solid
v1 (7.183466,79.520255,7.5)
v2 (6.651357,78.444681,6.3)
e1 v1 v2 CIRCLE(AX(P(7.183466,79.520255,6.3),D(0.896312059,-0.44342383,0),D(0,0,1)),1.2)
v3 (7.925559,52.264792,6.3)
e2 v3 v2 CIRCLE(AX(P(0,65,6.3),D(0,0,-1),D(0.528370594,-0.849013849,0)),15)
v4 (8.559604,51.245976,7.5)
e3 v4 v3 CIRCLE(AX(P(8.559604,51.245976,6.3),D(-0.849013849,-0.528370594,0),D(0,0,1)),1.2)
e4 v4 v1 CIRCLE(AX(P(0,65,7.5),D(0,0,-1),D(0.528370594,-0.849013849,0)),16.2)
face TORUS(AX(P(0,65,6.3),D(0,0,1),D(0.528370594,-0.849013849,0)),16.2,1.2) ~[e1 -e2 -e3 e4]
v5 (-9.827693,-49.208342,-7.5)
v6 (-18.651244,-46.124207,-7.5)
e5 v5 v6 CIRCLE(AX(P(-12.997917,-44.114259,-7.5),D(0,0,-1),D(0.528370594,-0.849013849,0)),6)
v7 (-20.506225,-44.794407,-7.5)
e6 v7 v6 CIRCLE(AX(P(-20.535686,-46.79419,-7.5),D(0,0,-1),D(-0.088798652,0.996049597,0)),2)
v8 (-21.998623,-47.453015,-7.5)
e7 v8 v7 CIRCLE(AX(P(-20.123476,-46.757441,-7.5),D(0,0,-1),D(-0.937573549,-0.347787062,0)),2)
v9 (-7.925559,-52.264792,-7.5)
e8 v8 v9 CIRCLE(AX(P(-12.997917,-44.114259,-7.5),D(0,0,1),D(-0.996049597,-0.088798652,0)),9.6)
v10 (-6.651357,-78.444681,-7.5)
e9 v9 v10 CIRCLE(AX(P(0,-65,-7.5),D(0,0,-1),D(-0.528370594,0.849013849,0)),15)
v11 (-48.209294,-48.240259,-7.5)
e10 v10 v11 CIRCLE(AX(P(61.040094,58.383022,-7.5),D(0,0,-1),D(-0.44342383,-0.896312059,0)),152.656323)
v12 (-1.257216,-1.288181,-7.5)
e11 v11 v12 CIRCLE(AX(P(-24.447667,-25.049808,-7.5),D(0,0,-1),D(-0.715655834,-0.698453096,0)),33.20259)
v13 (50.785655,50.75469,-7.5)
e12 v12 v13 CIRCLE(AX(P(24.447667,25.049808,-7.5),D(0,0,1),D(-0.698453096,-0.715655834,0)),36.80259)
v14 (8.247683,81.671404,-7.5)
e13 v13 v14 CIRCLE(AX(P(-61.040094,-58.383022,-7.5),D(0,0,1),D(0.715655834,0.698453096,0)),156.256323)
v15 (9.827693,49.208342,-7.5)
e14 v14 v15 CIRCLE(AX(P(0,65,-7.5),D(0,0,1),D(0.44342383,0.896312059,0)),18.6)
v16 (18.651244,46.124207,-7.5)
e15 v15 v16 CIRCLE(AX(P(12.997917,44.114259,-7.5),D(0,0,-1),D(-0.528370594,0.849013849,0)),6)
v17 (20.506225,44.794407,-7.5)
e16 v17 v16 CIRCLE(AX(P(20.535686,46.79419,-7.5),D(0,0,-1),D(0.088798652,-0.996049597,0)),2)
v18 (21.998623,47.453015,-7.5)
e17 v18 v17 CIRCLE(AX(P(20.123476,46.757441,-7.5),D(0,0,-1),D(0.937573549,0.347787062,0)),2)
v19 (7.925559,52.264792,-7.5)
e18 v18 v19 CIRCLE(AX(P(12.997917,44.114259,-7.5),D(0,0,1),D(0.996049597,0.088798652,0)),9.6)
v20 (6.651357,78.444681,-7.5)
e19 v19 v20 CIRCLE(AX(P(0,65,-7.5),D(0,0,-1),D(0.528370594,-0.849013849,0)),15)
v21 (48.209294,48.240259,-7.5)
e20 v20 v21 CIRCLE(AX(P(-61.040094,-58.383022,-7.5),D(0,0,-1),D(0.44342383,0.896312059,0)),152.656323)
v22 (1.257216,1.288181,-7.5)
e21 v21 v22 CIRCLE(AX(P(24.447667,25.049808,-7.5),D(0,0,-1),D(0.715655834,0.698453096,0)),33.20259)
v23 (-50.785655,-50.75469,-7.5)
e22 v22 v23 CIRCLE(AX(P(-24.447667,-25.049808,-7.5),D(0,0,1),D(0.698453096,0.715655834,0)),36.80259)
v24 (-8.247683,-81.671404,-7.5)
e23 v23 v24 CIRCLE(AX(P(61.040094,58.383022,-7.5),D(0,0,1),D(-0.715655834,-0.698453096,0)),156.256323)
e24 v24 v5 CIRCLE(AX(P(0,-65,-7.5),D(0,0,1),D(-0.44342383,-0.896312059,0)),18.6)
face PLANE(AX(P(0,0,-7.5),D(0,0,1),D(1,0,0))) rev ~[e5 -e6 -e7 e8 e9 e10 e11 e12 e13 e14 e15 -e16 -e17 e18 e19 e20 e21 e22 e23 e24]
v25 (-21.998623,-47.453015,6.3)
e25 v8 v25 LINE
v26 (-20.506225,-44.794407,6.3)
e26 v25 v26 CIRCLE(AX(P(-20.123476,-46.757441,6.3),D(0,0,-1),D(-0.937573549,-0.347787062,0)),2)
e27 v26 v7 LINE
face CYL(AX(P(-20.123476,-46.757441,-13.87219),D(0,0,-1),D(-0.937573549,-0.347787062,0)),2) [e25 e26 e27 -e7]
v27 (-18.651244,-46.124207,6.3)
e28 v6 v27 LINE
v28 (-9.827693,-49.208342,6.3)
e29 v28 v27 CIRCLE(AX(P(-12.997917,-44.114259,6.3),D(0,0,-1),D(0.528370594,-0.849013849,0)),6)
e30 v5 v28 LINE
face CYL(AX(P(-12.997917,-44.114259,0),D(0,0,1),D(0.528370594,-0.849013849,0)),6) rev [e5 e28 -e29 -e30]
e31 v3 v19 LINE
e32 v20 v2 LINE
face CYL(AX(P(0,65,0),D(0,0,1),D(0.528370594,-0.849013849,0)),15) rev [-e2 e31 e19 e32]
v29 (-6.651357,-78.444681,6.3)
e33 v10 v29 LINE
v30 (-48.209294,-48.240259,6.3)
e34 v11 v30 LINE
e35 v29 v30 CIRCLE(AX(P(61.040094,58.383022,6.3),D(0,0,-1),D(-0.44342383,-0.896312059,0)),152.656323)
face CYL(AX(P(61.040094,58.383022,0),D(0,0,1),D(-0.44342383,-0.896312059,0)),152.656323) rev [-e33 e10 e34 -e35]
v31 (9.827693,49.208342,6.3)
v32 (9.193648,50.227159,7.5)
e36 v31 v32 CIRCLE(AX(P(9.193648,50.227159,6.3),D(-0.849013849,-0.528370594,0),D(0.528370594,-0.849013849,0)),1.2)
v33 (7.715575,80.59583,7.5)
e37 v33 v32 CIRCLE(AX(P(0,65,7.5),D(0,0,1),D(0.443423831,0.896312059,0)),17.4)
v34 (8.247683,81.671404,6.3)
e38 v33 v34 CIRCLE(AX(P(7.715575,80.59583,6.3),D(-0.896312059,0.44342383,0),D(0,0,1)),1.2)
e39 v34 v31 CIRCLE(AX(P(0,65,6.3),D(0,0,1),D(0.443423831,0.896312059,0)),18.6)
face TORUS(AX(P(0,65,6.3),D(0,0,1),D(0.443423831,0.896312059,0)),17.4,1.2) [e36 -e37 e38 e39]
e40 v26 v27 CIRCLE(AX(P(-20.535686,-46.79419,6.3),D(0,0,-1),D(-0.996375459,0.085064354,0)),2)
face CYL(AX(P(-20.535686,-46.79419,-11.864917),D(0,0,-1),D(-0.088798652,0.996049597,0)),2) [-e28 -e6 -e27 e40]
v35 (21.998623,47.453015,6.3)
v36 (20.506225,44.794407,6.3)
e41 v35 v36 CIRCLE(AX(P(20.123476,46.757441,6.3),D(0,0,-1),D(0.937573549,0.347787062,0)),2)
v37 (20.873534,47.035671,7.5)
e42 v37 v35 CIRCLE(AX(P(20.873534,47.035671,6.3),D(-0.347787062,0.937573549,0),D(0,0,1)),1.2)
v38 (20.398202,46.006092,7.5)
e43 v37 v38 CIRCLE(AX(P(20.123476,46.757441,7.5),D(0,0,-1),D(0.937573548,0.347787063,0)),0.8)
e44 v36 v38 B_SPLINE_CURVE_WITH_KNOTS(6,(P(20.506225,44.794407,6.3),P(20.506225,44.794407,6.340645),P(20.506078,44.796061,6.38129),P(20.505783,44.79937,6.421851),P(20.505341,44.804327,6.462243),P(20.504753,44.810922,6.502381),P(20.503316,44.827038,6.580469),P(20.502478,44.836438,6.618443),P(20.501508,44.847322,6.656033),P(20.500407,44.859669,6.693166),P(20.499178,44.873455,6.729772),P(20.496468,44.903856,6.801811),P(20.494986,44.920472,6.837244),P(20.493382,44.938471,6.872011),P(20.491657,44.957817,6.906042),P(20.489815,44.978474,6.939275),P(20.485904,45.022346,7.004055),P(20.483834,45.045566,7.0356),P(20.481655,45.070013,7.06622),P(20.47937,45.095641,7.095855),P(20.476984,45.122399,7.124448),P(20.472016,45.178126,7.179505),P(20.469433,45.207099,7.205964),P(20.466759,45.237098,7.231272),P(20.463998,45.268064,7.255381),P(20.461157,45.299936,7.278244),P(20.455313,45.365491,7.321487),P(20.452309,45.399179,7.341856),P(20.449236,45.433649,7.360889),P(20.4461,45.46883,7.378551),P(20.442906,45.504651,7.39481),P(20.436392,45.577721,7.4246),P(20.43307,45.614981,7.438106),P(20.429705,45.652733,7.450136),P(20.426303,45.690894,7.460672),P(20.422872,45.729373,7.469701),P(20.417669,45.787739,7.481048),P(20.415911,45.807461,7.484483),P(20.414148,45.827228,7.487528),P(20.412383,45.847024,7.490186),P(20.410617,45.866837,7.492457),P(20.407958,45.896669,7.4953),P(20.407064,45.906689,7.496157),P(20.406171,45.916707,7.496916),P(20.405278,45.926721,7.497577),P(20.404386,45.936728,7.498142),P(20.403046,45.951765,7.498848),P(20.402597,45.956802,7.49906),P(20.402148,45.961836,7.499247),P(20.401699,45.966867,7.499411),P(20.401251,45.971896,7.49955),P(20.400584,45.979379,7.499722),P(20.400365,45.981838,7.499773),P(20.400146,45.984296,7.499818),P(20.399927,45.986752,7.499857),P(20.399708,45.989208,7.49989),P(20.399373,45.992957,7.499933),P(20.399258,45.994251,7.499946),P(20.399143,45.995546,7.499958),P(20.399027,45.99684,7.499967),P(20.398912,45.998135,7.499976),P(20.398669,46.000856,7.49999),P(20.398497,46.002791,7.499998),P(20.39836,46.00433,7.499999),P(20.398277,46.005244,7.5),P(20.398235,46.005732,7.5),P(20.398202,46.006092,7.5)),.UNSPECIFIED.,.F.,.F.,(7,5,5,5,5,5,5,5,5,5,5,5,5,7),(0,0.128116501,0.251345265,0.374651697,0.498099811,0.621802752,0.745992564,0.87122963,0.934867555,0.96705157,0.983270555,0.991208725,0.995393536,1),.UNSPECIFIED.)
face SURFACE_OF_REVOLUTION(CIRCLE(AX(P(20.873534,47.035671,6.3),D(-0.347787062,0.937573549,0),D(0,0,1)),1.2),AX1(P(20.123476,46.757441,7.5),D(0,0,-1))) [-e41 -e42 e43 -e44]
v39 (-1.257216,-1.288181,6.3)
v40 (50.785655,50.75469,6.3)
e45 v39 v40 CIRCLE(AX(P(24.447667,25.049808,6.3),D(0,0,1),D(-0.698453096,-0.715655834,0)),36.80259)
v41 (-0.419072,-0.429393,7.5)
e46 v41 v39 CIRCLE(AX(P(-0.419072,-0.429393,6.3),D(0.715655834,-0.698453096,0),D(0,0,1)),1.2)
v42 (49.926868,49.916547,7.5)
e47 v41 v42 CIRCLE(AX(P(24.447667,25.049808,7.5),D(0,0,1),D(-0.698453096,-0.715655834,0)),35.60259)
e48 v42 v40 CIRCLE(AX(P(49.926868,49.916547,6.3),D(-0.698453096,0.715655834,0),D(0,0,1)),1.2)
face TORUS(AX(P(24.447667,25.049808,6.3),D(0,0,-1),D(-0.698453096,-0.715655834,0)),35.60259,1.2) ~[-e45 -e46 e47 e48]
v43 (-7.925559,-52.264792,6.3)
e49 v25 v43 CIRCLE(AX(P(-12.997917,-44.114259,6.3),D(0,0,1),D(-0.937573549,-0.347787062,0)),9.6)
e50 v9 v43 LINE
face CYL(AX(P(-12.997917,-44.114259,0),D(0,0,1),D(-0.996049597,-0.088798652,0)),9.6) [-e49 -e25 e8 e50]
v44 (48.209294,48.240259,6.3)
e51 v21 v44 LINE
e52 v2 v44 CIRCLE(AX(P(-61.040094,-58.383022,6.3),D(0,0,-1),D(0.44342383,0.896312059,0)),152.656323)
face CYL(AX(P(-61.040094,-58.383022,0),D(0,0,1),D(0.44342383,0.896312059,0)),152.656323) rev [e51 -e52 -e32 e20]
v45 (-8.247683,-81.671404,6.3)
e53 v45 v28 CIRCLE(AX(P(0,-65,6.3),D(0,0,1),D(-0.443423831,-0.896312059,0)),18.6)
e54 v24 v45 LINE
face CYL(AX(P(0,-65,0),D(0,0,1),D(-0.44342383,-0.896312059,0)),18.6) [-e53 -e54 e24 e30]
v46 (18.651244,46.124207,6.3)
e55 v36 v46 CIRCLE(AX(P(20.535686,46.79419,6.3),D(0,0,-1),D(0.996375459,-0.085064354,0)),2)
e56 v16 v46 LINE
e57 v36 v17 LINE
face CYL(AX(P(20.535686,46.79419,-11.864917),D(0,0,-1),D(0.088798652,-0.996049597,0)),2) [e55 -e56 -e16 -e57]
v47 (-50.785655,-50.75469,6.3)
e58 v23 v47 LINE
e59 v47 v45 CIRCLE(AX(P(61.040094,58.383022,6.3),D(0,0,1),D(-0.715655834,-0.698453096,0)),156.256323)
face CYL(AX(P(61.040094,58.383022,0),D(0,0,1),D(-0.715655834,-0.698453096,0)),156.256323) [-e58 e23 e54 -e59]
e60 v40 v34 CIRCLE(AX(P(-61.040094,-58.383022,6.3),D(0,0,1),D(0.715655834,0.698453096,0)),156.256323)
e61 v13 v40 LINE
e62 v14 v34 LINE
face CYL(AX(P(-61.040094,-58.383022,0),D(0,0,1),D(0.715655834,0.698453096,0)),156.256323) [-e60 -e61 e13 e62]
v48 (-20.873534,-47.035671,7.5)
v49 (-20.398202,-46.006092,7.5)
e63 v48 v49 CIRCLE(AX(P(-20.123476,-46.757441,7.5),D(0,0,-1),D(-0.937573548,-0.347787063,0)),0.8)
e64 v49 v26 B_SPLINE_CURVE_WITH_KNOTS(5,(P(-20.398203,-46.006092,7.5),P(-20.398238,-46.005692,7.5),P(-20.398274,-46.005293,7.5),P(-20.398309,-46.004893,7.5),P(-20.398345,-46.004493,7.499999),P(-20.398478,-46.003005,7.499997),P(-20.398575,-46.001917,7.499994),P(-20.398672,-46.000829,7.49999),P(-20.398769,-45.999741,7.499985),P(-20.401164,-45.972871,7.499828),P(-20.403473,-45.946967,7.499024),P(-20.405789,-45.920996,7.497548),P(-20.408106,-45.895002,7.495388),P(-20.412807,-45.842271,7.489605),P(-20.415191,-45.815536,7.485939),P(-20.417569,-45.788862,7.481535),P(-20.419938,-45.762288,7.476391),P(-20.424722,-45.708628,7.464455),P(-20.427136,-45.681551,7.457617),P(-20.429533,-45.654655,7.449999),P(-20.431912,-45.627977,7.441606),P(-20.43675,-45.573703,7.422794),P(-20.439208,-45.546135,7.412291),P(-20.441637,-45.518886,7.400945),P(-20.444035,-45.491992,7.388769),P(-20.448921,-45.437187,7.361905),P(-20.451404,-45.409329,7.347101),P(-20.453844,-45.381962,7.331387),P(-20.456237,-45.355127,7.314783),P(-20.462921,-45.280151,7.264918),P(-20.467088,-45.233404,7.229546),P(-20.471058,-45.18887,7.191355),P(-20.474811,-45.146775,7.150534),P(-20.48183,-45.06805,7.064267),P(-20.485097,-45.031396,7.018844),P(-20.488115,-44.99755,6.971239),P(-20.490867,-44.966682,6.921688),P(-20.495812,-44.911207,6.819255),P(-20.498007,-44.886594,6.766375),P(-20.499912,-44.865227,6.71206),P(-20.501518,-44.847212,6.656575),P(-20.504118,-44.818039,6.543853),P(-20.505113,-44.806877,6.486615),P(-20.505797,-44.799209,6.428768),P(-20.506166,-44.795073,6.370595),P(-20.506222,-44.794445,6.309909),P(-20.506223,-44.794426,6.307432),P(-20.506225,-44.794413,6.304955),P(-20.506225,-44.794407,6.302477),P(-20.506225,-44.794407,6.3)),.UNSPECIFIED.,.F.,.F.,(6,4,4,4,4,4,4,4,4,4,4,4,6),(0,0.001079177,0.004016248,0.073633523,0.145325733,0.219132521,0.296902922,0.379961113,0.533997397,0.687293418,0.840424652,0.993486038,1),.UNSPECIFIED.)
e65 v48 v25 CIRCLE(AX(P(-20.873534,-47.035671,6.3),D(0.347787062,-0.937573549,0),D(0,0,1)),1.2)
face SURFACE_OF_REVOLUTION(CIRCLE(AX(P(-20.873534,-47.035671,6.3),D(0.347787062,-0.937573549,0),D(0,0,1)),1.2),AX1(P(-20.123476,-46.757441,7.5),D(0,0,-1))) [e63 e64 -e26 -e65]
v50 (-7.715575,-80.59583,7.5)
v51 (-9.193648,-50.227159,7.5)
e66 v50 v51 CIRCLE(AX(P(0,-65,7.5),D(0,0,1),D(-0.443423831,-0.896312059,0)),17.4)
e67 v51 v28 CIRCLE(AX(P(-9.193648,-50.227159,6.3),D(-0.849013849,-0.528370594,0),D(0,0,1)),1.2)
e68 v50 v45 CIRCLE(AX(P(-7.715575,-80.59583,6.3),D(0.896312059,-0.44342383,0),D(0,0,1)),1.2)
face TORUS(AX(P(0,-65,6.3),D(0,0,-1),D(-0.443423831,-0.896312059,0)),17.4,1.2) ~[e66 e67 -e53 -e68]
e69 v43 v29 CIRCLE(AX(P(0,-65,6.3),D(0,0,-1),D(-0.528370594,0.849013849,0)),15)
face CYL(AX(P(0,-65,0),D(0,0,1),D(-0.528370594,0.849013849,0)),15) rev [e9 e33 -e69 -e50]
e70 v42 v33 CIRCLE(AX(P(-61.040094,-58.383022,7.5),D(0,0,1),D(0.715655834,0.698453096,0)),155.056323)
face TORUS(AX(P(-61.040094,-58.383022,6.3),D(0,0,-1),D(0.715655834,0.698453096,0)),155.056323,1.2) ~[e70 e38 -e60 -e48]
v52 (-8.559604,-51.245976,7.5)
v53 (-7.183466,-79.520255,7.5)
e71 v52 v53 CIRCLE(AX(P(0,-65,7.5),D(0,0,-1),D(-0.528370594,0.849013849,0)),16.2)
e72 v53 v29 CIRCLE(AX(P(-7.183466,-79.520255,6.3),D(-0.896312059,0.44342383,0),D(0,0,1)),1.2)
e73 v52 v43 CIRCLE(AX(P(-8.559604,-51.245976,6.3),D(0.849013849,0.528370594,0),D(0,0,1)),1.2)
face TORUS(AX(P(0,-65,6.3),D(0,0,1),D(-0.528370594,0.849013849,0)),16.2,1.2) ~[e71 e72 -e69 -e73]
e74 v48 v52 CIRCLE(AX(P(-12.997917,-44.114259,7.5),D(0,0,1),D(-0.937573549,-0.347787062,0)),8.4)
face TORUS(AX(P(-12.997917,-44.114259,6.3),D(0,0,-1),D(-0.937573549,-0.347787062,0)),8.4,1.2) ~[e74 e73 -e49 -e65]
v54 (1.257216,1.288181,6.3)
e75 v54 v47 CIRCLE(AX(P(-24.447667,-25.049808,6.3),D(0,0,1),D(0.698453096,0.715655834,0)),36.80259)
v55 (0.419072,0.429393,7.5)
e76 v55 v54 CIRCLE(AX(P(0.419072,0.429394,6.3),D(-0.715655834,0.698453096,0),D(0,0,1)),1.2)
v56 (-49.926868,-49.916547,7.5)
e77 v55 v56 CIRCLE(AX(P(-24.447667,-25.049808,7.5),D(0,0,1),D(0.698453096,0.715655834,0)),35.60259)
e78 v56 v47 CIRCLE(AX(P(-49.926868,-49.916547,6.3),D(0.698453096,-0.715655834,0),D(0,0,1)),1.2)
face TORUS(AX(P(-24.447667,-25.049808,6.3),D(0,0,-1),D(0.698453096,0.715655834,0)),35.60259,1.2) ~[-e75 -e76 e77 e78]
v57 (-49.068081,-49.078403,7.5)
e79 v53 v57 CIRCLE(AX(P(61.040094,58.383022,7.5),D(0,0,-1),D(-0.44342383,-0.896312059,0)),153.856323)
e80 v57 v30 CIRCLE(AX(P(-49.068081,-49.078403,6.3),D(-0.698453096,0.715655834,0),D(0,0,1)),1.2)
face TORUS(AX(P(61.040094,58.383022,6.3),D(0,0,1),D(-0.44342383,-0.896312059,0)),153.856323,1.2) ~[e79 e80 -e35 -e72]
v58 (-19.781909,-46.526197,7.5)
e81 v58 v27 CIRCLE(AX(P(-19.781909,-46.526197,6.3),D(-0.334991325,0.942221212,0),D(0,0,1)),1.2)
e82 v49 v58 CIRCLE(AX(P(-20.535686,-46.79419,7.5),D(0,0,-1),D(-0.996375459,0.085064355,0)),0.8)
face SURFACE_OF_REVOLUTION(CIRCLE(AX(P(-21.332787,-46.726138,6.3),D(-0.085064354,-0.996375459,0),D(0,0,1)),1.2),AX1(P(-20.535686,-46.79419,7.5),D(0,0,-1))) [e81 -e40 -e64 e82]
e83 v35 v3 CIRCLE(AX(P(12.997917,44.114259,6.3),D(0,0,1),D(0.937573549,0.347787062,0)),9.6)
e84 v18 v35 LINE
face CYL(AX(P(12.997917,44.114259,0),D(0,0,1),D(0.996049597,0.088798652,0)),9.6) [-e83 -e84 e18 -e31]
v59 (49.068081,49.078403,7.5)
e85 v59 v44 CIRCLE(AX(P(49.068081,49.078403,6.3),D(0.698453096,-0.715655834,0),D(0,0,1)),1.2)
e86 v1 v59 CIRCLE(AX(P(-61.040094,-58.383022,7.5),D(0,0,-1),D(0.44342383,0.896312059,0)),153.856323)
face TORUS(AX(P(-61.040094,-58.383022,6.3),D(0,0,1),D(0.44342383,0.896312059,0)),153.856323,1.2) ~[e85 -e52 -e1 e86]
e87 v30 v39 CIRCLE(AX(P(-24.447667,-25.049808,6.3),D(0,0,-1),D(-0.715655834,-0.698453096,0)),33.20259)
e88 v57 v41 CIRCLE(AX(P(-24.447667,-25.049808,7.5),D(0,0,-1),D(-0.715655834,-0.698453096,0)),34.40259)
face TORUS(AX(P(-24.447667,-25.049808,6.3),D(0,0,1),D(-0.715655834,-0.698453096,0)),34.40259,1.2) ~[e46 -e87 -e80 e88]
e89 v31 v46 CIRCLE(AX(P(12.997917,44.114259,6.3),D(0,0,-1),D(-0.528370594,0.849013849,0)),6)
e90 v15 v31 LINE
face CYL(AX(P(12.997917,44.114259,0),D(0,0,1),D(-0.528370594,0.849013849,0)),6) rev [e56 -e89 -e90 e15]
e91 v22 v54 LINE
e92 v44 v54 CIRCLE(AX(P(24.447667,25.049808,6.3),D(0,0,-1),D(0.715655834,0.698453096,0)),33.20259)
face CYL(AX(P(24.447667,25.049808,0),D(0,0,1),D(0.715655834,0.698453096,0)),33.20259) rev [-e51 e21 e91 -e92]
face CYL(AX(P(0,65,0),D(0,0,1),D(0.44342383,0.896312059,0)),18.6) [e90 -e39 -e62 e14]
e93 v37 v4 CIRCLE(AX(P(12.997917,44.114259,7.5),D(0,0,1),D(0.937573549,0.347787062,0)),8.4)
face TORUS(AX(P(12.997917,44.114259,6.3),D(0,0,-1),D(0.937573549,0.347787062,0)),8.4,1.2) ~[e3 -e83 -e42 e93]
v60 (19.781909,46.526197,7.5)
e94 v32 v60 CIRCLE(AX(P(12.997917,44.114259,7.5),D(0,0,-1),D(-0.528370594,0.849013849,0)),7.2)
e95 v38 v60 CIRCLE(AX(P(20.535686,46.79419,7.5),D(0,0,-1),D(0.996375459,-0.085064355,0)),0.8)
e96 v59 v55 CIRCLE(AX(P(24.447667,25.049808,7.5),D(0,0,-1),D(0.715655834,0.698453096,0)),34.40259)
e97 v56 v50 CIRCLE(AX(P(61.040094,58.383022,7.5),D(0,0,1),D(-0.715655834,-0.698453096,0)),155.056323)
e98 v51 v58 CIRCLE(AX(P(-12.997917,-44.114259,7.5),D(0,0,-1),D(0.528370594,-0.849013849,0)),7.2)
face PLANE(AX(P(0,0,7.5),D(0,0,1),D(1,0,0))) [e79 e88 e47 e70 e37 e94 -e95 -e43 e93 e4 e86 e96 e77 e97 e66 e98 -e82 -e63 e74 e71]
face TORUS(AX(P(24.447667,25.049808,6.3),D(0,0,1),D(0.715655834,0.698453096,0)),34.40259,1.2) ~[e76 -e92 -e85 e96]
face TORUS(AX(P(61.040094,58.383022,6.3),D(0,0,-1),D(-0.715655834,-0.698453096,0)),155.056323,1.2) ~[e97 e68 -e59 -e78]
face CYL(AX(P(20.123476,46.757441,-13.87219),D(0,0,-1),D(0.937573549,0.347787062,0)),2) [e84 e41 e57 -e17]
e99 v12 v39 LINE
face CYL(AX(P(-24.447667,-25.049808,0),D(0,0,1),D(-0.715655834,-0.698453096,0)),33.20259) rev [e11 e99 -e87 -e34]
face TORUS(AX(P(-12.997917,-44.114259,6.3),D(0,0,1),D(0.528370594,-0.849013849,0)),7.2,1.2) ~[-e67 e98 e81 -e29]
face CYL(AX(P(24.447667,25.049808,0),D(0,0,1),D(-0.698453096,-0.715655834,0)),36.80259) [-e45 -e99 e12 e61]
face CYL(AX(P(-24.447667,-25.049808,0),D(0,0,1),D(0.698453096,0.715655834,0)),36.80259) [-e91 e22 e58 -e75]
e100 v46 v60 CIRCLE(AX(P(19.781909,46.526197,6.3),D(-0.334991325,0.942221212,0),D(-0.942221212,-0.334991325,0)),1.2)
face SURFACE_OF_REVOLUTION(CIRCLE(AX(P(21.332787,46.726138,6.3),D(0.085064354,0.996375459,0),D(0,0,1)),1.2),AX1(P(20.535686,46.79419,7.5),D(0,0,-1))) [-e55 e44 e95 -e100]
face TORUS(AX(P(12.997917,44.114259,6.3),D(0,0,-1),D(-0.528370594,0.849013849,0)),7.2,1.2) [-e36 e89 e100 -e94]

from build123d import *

# Parameters (mm, degrees)
F1_DEPTH     = 7.5
F2_T1_DEPTH  = 27.7443791337
F2_T3_DEPTH  = 23.7298334621
F3_T3_ANGLE  = 178.6060541067
F3_T6_ANGLE  = 178.6060541067
F3_T9_ANGLE  = 178.6060541067
F3_T12_ANGLE = 19.3744330298
F3_T15_ANGLE = 238.2179683188
F3_T18_ANGLE = 102.3234179936
F3_T21_ANGLE = 155.5482640924
F3_T24_ANGLE = 19.3744330298
F3_T27_ANGLE = 238.2179683188
F3_T30_ANGLE = 101.5434068893
F3_T33_ANGLE = 185.3047109678
F3_T36_ANGLE = 19.3744330298
F3_T39_ANGLE = 178.6060541067
F3_T42_ANGLE = 19.3744330298
F3_T45_ANGLE = 238.2179683188
F3_T48_ANGLE = 102.3234179936
F3_T51_ANGLE = 155.5482640924
F3_T54_ANGLE = 238.2179683188
F3_T57_ANGLE = 101.5434068893
F3_T60_ANGLE = 185.3047109678


# Not quite as in the source:
# - a fillet or chamfer that OpenCascade refuses, or shapes differently, is made with other operations: its cross-section is extruded or revolved along the edge and cut away or added


with BuildPart() as f1:
    # F0 (on Top) → F1 (new body, symmetric)
    with BuildSketch(Plane.XY):
        with BuildLine():
            ThreePointArc((7.925558911, 52.2647922691), (-14.9822650032, 64.2707981257), (6.6513574574, 78.4446808803))
            ThreePointArc((6.6513574574, 78.4446808803), (28.7100701018, 65.1032562904), (48.2092941819, 48.2402591103))
            ThreePointArc((48.2092941819, 48.2402591103), (47.925443489, 1.572031194), (1.2572155727, 1.2881805012))
            ThreePointArc((1.2572155727, 1.2881805012), (-50.4710279013, 0.9735532183), (-50.7856551842, -50.7546902558))
            ThreePointArc((-50.7856551842, -50.7546902558), (-30.8265929187, -68.0153571069), (-8.2476832472, -81.6714042916))
            ThreePointArc((-8.2476832472, -81.6714042916), (18.578008604, -64.0957896758), (-9.8276930496, -49.2083424137))
            ThreePointArc((-9.8276930496, -49.2083424137), (-15.6755755072, -49.4836301273), (-18.9742141949, -44.6470512362))
            Line((-18.9742141949, -44.6470512362), (-22.5599927435, -44.9667263851))
            ThreePointArc((-22.5599927435, -44.9667263851), (-17.2821708431, -52.7052526109), (-7.925558911, -52.2647922691))
            ThreePointArc((-7.925558911, -52.2647922691), (14.9822650032, -64.2707981257), (-6.6513574574, -78.4446808803))
            ThreePointArc((-6.6513574574, -78.4446808803), (-28.7100701018, -65.1032562904), (-48.2092941819, -48.2402591103))
            ThreePointArc((-48.2092941819, -48.2402591103), (-47.925443489, -1.572031194), (-1.2572155727, -1.2881805012))
            ThreePointArc((-1.2572155727, -1.2881805012), (50.4710279013, -0.9735532183), (50.7856551842, 50.7546902558))
            ThreePointArc((50.7856551842, 50.7546902558), (30.8265929187, 68.0153571069), (8.2476832472, 81.6714042916))
            ThreePointArc((8.2476832472, 81.6714042916), (-18.578008604, 64.0957896758), (9.8276930496, 49.2083424137))
            ThreePointArc((9.8276930496, 49.2083424137), (15.6755755072, 49.4836301273), (18.9742141949, 44.6470512362))
            Line((18.9742141949, 44.6470512362), (22.5599927435, 44.9667263851))
            ThreePointArc((22.5599927435, 44.9667263851), (17.2821708431, 52.7052526109), (7.925558911, 52.2647922691))
        make_face()
    extrude(amount=F1_DEPTH, both=True)

    # F2: fillet of radius 2 on 4 edges, made by hand

    # F2_s2 → F2_t1 (cut)
    with BuildSketch(Plane.XY.offset(-13.8721895669)):
        with BuildLine():
            ThreePointArc((21.9986226844, 47.4530151127), (21.8144329663, 45.6894226659), (20.3010728914, 44.7653417959))
            Line((20.3010728914, 44.7653417959), (22.5599927435, 44.9667263851))
            ThreePointArc((22.5599927435, 44.9667263851), (22.3621906734, 46.2285845899), (21.9986226844, 47.4530151127))
        make_face()
        with BuildLine():
            ThreePointArc((-21.9986226844, -47.4530151127), (-21.8144329663, -45.6894226659), (-20.3010728914, -44.7653417959))
            Line((-20.3010728914, -44.7653417959), (-22.5599927435, -44.9667263851))
            ThreePointArc((-22.5599927435, -44.9667263851), (-22.3621906734, -46.2285845899), (-21.9986226844, -47.4530151127))
        make_face()
    extrude(amount=F2_T1_DEPTH, mode=Mode.SUBTRACT)

    # F2_s4 → F2_t3 (cut)
    with BuildSketch(Plane.XY.offset(-11.864916731)):
        with BuildLine():
            ThreePointArc((20.713283615, 44.8020907258), (19.4561826722, 45.110541531), (18.651243886, 46.1242072699))
            ThreePointArc((18.651243886, 46.1242072699), (18.8594472197, 45.3958438712), (18.9742141949, 44.6470512362))
            Line((18.9742141949, 44.6470512362), (20.713283615, 44.8020907258))
        make_face()
        with BuildLine():
            ThreePointArc((-20.713283615, -44.8020907258), (-19.4561826722, -45.110541531), (-18.651243886, -46.1242072699))
            ThreePointArc((-18.651243886, -46.1242072699), (-18.8594472197, -45.3958438712), (-18.9742141949, -44.6470512362))
            Line((-18.9742141949, -44.6470512362), (-20.713283615, -44.8020907258))
        make_face()
    extrude(amount=F2_T3_DEPTH, mode=Mode.SUBTRACT)

    # F3: fillet of radius 1.2 on 2 edges, made by hand


with BuildPart() as f3_tool1:
    # F3_s2 → F3_t3 (revolve)
    with BuildSketch(Plane(origin=(0.5947272864, -0.6093752818, 0), x_dir=(0, 0, 1), z_dir=(0.698453096, -0.715655834, 0))):
        with BuildLine():
            ThreePointArc((7.5, 69.39482096), (7.1485281374, 68.5462928226), (6.3, 68.19482096))
            Line((6.3, 68.19482096), (7.5, 68.19482096))
            Line((7.5, 68.19482096), (7.5, 69.39482096))
        make_face()
    revolve(axis=Axis((-24.447667151, -25.0498075321, 7.5), (0, 0, -1)), revolution_arc=F3_T3_ANGLE)


with BuildPart() as f3_tool4:
    # F3_s5 → F3_t6 (revolve)
    with BuildSketch(Plane(origin=(0, 0, 0), x_dir=(0, 0, 1), z_dir=(0.715655834, -0.698453096, 0))):
        with BuildLine():
            ThreePointArc((7.5, -0.6), (7.1485281374, -1.4485281374), (6.3, -1.8))
            Line((6.3, -1.8), (7.5, -1.8))
            Line((7.5, -1.8), (7.5, -0.6))
        make_face()
    revolve(axis=Axis((-24.447667151, -25.0498075321, 7.5), (0, 0, 1)), revolution_arc=F3_T6_ANGLE)


with BuildPart() as f3_tool7:
    # F3_s8 → F3_t9 (revolve)
    with BuildSketch(Plane(origin=(-0.5947272864, 0.6093752818, 0), x_dir=(0, 0, 1), z_dir=(-0.698453096, 0.715655834, 0))):
        with BuildLine():
            ThreePointArc((7.5, 69.39482096), (7.1485281374, 68.5462928226), (6.3, 68.19482096))
            Line((6.3, 68.19482096), (7.5, 68.19482096))
            Line((7.5, 68.19482096), (7.5, 69.39482096))
        make_face()
    revolve(axis=Axis((24.447667151, 25.0498075321, 7.5), (0, 0, -1)), revolution_arc=F3_T9_ANGLE)


with BuildPart() as f3_tool10:
    # F3_s11 → F3_t12 (revolve)
    with BuildSketch(Plane(origin=(0.5947272864, -0.6093752818, 0), x_dir=(0, 0, 1), z_dir=(-0.698453096, 0.715655834, 0))):
        with BuildLine():
            ThreePointArc((7.5, -70.59482096), (7.1485281374, -71.4433490974), (6.3, -71.79482096))
            Line((6.3, -71.79482096), (7.5, -71.79482096))
            Line((7.5, -71.79482096), (7.5, -70.59482096))
        make_face()
    revolve(axis=Axis((61.0400941451, 58.3830224798, 7.5), (0, 0, 1)), revolution_arc=F3_T12_ANGLE)


with BuildPart() as f3_tool13:
    # F3_s14 → F3_t15 (revolve)
    with BuildSketch(Plane(origin=(25.8339982147, -12.7806050742, 0), x_dir=(0, 0, 1), z_dir=(-0.8963120587, 0.4434238305, 0))):
        with BuildLine():
            ThreePointArc((7.5, -75.6602838148), (7.1485281374, -76.5088119522), (6.3, -76.8602838148))
            Line((6.3, -76.8602838148), (7.5, -76.8602838148))
            Line((7.5, -76.8602838148), (7.5, -75.6602838148))
        make_face()
    revolve(axis=Axis((0, -65, 7.5), (0, 0, 1)), revolution_arc=F3_T15_ANGLE)


with BuildPart() as f3_tool16:
    # F3_s17 → F3_t18 (revolve)
    with BuildSketch(Plane(origin=(-29.1586068554, -18.1464065038, 0), x_dir=(0, 0, 1), z_dir=(0.8490138487, 0.5283705941, 0))):
        with BuildLine():
            ThreePointArc((7.5, 37.7859001671), (7.1485281374, 36.9373720297), (6.3, 36.5859001671))
            Line((6.3, 36.5859001671), (7.5, 36.5859001671))
            Line((7.5, 36.5859001671), (7.5, 37.7859001671))
        make_face()
    revolve(axis=Axis((-12.997916614, -44.1142593214, 7.5), (0, 0, -1)), revolution_arc=F3_T18_ANGLE)


with BuildPart() as f3_tool19:
    # F3_s20 → F3_t21 (revolve)
    with BuildSketch(Plane(origin=(-4.1146850802, -48.1961131121, 0), x_dir=(0, 0, 1), z_dir=(-0.0850643542, -0.9963754592, 0))):
        with BuildLine():
            ThreePointArc((7.5, 17.2807363317), (7.1485281374, 18.1292644691), (6.3, 18.4807363317))
            Line((6.3, 18.4807363317), (7.5, 18.4807363317))
            Line((7.5, 18.4807363317), (7.5, 17.2807363317))
        make_face()
    revolve(axis=Axis((-20.5356863101, -46.7941899196, 7.5), (0, 0, -1)), revolution_arc=F3_T21_ANGLE)


with BuildPart() as f3_tool22:
    # F3_s23 → F3_t24 (revolve)
    with BuildSketch(Plane(origin=(-25.8339982147, 12.7806050742, 0), x_dir=(0, 0, 1), z_dir=(-0.8963120587, 0.4434238305, 0))):
        with BuildLine():
            ThreePointArc((7.5, 74.4602838148), (7.1485281374, 73.6117556774), (6.3, 73.2602838148))
            Line((6.3, 73.2602838148), (7.5, 73.2602838148))
            Line((7.5, 73.2602838148), (7.5, 74.4602838148))
        make_face()
    revolve(axis=Axis((-61.0400941451, -58.3830224798, 7.5), (0, 0, -1)), revolution_arc=F3_T24_ANGLE)


with BuildPart() as f3_tool25:
    # F3_s26 → F3_t27 (revolve)
    with BuildSketch(Plane(origin=(29.1586068554, 18.1464065038, 0), x_dir=(0, 0, 1), z_dir=(0.8490138487, 0.5283705941, 0))):
        with BuildLine():
            ThreePointArc((7.5, -38.9859001671), (7.1485281374, -39.8344283045), (6.3, -40.1859001671))
            Line((6.3, -40.1859001671), (7.5, -40.1859001671))
            Line((7.5, -40.1859001671), (7.5, -38.9859001671))
        make_face()
    revolve(axis=Axis((0, 65, 7.5), (0, 0, -1)), revolution_arc=F3_T27_ANGLE)


with BuildPart() as f3_tool28:
    # F3_s29 → F3_t30 (revolve)
    with BuildSketch(Plane(origin=(-12.8124250757, 34.5400740165, 0), x_dir=(0, 0, 1), z_dir=(0.3477870616, -0.937573549, 0))):
        with BuildLine():
            ThreePointArc((7.5, -35.9288714334), (7.1485281374, -36.7773995708), (6.3, -37.1288714334))
            Line((6.3, -37.1288714334), (7.5, -37.1288714334))
            Line((7.5, -37.1288714334), (7.5, -35.9288714334))
        make_face()
    revolve(axis=Axis((12.997916614, 44.1142593214, 7.5), (0, 0, 1)), revolution_arc=F3_T30_ANGLE)


with BuildPart() as f3_tool31:
    # F3_s32 → F3_t33 (revolve)
    with BuildSketch(Plane(origin=(-12.812425077, 34.5400740137, 0), x_dir=(0, 0, 1), z_dir=(-0.3477870617, 0.937573549, 0))):
        with BuildLine():
            ThreePointArc((7.5, 35.9288714354), (7.1485281374, 36.7773995729), (6.3, 37.1288714354))
            Line((6.3, 37.1288714354), (7.5, 37.1288714354))
            Line((7.5, 37.1288714354), (7.5, 35.9288714354))
        make_face()
    revolve(axis=Axis((20.1234755865, 46.7574409894, 7.5), (0, 0, -1)), revolution_arc=F3_T33_ANGLE)


with BuildPart() as f3_tool34:
    # F3_s35 → F3_t36 (revolve)
    with BuildSketch(Plane(origin=(25.8339982147, -12.7806050742, 0), x_dir=(0, 0, 1), z_dir=(0.8963120587, -0.4434238305, 0))):
        with BuildLine():
            ThreePointArc((7.5, 74.4602838148), (7.1485281374, 73.6117556774), (6.3, 73.2602838148))
            Line((6.3, 73.2602838148), (7.5, 73.2602838148))
            Line((7.5, 73.2602838148), (7.5, 74.4602838148))
        make_face()
    revolve(axis=Axis((61.0400941451, 58.3830224798, 7.5), (0, 0, -1)), revolution_arc=F3_T36_ANGLE)


with BuildPart() as f3_tool37:
    # F3_s38 → F3_t39 (revolve)
    with BuildSketch(Plane(origin=(0, 0, 0), x_dir=(0, 0, 1), z_dir=(-0.715655834, 0.698453096, 0))):
        with BuildLine():
            ThreePointArc((7.5, -0.6), (7.1485281374, -1.4485281374), (6.3, -1.8))
            Line((6.3, -1.8), (7.5, -1.8))
            Line((7.5, -1.8), (7.5, -0.6))
        make_face()
    revolve(axis=Axis((24.447667151, 25.0498075321, 7.5), (0, 0, 1)), revolution_arc=F3_T39_ANGLE)


with BuildPart() as f3_tool40:
    # F3_s41 → F3_t42 (revolve)
    with BuildSketch(Plane(origin=(-0.5947272864, 0.6093752818, 0), x_dir=(0, 0, 1), z_dir=(0.698453096, -0.715655834, 0))):
        with BuildLine():
            ThreePointArc((7.5, -70.59482096), (7.1485281374, -71.4433490974), (6.3, -71.79482096))
            Line((6.3, -71.79482096), (7.5, -71.79482096))
            Line((7.5, -71.79482096), (7.5, -70.59482096))
        make_face()
    revolve(axis=Axis((-61.0400941451, -58.3830224798, 7.5), (0, 0, 1)), revolution_arc=F3_T42_ANGLE)


with BuildPart() as f3_tool43:
    # F3_s44 → F3_t45 (revolve)
    with BuildSketch(Plane(origin=(-25.8339982147, 12.7806050742, 0), x_dir=(0, 0, 1), z_dir=(0.8963120587, -0.4434238305, 0))):
        with BuildLine():
            ThreePointArc((6.3, -76.8602838148), (7.1485281374, -76.5088119522), (7.5, -75.6602838148))
            Line((7.5, -75.6602838148), (7.5, -76.8602838148))
            Line((7.5, -76.8602838148), (6.3, -76.8602838148))
        make_face()
    revolve(axis=Axis((0, 65, 7.5), (0, 0, 1)), revolution_arc=F3_T45_ANGLE)


with BuildPart() as f3_tool46:
    # F3_s47 → F3_t48 (revolve)
    with BuildSketch(Plane(origin=(29.1586068554, 18.1464065038, 0), x_dir=(0, 0, 1), z_dir=(-0.8490138487, -0.5283705941, 0))):
        with BuildLine():
            ThreePointArc((6.3, 36.5859001671), (7.1485281374, 36.9373720297), (7.5, 37.7859001671))
            Line((7.5, 37.7859001671), (7.5, 36.5859001671))
            Line((7.5, 36.5859001671), (6.3, 36.5859001671))
        make_face()
    revolve(axis=Axis((12.997916614, 44.1142593214, 7.5), (0, 0, -1)), revolution_arc=F3_T48_ANGLE)


with BuildPart() as f3_tool49:
    # F3_s50 → F3_t51 (revolve)
    with BuildSketch(Plane(origin=(4.1146850802, 48.1961131121, 0), x_dir=(0, 0, 1), z_dir=(0.0850643542, 0.9963754592, 0))):
        with BuildLine():
            ThreePointArc((7.5, 17.2807363317), (7.1485281374, 18.1292644691), (6.3, 18.4807363317))
            Line((6.3, 18.4807363317), (7.5, 18.4807363317))
            Line((7.5, 18.4807363317), (7.5, 17.2807363317))
        make_face()
    revolve(axis=Axis((20.5356863101, 46.7941899196, 7.5), (0, 0, -1)), revolution_arc=F3_T51_ANGLE)


with BuildPart() as f3_tool52:
    # F3_s53 → F3_t54 (revolve)
    with BuildSketch(Plane(origin=(-29.1586068554, -18.1464065038, 0), x_dir=(0, 0, 1), z_dir=(-0.8490138487, -0.5283705941, 0))):
        with BuildLine():
            ThreePointArc((7.5, -38.9859001671), (7.1485281374, -39.8344283045), (6.3, -40.1859001671))
            Line((6.3, -40.1859001671), (7.5, -40.1859001671))
            Line((7.5, -40.1859001671), (7.5, -38.9859001671))
        make_face()
    revolve(axis=Axis((0, -65, 7.5), (0, 0, -1)), revolution_arc=F3_T54_ANGLE)


with BuildPart() as f3_tool55:
    # F3_s56 → F3_t57 (revolve)
    with BuildSketch(Plane(origin=(12.8124250757, -34.5400740165, 0), x_dir=(0, 0, 1), z_dir=(-0.3477870616, 0.937573549, 0))):
        with BuildLine():
            ThreePointArc((7.5, -35.9288714334), (7.1485281374, -36.7773995708), (6.3, -37.1288714334))
            Line((6.3, -37.1288714334), (7.5, -37.1288714334))
            Line((7.5, -37.1288714334), (7.5, -35.9288714334))
        make_face()
    revolve(axis=Axis((-12.997916614, -44.1142593214, 7.5), (0, 0, 1)), revolution_arc=F3_T57_ANGLE)


with BuildPart() as f3_tool58:
    # F3_s59 → F3_t60 (revolve)
    with BuildSketch(Plane(origin=(12.812425077, -34.5400740137, 0), x_dir=(0, 0, 1), z_dir=(0.3477870617, -0.937573549, 0))):
        with BuildLine():
            ThreePointArc((7.5, 35.9288714354), (7.1485281374, 36.7773995729), (6.3, 37.1288714354))
            Line((6.3, 37.1288714354), (7.5, 37.1288714354))
            Line((7.5, 37.1288714354), (7.5, 35.9288714354))
        make_face()
    revolve(axis=Axis((-20.1234755865, -46.7574409894, 7.5), (0, 0, -1)), revolution_arc=F3_T60_ANGLE)


with BuildPart() as f1_1:
    add(f1.part)

    # F3_t61: cut F3_tool1, F3_tool4, F3_tool7, F3_tool10, F3_tool13, F3_tool16, F3_tool19, F3_tool22, F3_tool25, F3_tool28, F3_tool31, F3_tool34, F3_tool37, F3_tool40, F3_tool43, F3_tool46, F3_tool49, F3_tool52, F3_tool55, F3_tool58
    add([f3_tool1.part, f3_tool4.part, f3_tool7.part, f3_tool10.part, f3_tool13.part, f3_tool16.part, f3_tool19.part, f3_tool22.part, f3_tool25.part, f3_tool28.part, f3_tool31.part, f3_tool34.part, f3_tool37.part, f3_tool40.part, f3_tool43.part, f3_tool46.part, f3_tool49.part, f3_tool52.part, f3_tool55.part, f3_tool58.part], mode=Mode.SUBTRACT)


solid = f1_1.part
